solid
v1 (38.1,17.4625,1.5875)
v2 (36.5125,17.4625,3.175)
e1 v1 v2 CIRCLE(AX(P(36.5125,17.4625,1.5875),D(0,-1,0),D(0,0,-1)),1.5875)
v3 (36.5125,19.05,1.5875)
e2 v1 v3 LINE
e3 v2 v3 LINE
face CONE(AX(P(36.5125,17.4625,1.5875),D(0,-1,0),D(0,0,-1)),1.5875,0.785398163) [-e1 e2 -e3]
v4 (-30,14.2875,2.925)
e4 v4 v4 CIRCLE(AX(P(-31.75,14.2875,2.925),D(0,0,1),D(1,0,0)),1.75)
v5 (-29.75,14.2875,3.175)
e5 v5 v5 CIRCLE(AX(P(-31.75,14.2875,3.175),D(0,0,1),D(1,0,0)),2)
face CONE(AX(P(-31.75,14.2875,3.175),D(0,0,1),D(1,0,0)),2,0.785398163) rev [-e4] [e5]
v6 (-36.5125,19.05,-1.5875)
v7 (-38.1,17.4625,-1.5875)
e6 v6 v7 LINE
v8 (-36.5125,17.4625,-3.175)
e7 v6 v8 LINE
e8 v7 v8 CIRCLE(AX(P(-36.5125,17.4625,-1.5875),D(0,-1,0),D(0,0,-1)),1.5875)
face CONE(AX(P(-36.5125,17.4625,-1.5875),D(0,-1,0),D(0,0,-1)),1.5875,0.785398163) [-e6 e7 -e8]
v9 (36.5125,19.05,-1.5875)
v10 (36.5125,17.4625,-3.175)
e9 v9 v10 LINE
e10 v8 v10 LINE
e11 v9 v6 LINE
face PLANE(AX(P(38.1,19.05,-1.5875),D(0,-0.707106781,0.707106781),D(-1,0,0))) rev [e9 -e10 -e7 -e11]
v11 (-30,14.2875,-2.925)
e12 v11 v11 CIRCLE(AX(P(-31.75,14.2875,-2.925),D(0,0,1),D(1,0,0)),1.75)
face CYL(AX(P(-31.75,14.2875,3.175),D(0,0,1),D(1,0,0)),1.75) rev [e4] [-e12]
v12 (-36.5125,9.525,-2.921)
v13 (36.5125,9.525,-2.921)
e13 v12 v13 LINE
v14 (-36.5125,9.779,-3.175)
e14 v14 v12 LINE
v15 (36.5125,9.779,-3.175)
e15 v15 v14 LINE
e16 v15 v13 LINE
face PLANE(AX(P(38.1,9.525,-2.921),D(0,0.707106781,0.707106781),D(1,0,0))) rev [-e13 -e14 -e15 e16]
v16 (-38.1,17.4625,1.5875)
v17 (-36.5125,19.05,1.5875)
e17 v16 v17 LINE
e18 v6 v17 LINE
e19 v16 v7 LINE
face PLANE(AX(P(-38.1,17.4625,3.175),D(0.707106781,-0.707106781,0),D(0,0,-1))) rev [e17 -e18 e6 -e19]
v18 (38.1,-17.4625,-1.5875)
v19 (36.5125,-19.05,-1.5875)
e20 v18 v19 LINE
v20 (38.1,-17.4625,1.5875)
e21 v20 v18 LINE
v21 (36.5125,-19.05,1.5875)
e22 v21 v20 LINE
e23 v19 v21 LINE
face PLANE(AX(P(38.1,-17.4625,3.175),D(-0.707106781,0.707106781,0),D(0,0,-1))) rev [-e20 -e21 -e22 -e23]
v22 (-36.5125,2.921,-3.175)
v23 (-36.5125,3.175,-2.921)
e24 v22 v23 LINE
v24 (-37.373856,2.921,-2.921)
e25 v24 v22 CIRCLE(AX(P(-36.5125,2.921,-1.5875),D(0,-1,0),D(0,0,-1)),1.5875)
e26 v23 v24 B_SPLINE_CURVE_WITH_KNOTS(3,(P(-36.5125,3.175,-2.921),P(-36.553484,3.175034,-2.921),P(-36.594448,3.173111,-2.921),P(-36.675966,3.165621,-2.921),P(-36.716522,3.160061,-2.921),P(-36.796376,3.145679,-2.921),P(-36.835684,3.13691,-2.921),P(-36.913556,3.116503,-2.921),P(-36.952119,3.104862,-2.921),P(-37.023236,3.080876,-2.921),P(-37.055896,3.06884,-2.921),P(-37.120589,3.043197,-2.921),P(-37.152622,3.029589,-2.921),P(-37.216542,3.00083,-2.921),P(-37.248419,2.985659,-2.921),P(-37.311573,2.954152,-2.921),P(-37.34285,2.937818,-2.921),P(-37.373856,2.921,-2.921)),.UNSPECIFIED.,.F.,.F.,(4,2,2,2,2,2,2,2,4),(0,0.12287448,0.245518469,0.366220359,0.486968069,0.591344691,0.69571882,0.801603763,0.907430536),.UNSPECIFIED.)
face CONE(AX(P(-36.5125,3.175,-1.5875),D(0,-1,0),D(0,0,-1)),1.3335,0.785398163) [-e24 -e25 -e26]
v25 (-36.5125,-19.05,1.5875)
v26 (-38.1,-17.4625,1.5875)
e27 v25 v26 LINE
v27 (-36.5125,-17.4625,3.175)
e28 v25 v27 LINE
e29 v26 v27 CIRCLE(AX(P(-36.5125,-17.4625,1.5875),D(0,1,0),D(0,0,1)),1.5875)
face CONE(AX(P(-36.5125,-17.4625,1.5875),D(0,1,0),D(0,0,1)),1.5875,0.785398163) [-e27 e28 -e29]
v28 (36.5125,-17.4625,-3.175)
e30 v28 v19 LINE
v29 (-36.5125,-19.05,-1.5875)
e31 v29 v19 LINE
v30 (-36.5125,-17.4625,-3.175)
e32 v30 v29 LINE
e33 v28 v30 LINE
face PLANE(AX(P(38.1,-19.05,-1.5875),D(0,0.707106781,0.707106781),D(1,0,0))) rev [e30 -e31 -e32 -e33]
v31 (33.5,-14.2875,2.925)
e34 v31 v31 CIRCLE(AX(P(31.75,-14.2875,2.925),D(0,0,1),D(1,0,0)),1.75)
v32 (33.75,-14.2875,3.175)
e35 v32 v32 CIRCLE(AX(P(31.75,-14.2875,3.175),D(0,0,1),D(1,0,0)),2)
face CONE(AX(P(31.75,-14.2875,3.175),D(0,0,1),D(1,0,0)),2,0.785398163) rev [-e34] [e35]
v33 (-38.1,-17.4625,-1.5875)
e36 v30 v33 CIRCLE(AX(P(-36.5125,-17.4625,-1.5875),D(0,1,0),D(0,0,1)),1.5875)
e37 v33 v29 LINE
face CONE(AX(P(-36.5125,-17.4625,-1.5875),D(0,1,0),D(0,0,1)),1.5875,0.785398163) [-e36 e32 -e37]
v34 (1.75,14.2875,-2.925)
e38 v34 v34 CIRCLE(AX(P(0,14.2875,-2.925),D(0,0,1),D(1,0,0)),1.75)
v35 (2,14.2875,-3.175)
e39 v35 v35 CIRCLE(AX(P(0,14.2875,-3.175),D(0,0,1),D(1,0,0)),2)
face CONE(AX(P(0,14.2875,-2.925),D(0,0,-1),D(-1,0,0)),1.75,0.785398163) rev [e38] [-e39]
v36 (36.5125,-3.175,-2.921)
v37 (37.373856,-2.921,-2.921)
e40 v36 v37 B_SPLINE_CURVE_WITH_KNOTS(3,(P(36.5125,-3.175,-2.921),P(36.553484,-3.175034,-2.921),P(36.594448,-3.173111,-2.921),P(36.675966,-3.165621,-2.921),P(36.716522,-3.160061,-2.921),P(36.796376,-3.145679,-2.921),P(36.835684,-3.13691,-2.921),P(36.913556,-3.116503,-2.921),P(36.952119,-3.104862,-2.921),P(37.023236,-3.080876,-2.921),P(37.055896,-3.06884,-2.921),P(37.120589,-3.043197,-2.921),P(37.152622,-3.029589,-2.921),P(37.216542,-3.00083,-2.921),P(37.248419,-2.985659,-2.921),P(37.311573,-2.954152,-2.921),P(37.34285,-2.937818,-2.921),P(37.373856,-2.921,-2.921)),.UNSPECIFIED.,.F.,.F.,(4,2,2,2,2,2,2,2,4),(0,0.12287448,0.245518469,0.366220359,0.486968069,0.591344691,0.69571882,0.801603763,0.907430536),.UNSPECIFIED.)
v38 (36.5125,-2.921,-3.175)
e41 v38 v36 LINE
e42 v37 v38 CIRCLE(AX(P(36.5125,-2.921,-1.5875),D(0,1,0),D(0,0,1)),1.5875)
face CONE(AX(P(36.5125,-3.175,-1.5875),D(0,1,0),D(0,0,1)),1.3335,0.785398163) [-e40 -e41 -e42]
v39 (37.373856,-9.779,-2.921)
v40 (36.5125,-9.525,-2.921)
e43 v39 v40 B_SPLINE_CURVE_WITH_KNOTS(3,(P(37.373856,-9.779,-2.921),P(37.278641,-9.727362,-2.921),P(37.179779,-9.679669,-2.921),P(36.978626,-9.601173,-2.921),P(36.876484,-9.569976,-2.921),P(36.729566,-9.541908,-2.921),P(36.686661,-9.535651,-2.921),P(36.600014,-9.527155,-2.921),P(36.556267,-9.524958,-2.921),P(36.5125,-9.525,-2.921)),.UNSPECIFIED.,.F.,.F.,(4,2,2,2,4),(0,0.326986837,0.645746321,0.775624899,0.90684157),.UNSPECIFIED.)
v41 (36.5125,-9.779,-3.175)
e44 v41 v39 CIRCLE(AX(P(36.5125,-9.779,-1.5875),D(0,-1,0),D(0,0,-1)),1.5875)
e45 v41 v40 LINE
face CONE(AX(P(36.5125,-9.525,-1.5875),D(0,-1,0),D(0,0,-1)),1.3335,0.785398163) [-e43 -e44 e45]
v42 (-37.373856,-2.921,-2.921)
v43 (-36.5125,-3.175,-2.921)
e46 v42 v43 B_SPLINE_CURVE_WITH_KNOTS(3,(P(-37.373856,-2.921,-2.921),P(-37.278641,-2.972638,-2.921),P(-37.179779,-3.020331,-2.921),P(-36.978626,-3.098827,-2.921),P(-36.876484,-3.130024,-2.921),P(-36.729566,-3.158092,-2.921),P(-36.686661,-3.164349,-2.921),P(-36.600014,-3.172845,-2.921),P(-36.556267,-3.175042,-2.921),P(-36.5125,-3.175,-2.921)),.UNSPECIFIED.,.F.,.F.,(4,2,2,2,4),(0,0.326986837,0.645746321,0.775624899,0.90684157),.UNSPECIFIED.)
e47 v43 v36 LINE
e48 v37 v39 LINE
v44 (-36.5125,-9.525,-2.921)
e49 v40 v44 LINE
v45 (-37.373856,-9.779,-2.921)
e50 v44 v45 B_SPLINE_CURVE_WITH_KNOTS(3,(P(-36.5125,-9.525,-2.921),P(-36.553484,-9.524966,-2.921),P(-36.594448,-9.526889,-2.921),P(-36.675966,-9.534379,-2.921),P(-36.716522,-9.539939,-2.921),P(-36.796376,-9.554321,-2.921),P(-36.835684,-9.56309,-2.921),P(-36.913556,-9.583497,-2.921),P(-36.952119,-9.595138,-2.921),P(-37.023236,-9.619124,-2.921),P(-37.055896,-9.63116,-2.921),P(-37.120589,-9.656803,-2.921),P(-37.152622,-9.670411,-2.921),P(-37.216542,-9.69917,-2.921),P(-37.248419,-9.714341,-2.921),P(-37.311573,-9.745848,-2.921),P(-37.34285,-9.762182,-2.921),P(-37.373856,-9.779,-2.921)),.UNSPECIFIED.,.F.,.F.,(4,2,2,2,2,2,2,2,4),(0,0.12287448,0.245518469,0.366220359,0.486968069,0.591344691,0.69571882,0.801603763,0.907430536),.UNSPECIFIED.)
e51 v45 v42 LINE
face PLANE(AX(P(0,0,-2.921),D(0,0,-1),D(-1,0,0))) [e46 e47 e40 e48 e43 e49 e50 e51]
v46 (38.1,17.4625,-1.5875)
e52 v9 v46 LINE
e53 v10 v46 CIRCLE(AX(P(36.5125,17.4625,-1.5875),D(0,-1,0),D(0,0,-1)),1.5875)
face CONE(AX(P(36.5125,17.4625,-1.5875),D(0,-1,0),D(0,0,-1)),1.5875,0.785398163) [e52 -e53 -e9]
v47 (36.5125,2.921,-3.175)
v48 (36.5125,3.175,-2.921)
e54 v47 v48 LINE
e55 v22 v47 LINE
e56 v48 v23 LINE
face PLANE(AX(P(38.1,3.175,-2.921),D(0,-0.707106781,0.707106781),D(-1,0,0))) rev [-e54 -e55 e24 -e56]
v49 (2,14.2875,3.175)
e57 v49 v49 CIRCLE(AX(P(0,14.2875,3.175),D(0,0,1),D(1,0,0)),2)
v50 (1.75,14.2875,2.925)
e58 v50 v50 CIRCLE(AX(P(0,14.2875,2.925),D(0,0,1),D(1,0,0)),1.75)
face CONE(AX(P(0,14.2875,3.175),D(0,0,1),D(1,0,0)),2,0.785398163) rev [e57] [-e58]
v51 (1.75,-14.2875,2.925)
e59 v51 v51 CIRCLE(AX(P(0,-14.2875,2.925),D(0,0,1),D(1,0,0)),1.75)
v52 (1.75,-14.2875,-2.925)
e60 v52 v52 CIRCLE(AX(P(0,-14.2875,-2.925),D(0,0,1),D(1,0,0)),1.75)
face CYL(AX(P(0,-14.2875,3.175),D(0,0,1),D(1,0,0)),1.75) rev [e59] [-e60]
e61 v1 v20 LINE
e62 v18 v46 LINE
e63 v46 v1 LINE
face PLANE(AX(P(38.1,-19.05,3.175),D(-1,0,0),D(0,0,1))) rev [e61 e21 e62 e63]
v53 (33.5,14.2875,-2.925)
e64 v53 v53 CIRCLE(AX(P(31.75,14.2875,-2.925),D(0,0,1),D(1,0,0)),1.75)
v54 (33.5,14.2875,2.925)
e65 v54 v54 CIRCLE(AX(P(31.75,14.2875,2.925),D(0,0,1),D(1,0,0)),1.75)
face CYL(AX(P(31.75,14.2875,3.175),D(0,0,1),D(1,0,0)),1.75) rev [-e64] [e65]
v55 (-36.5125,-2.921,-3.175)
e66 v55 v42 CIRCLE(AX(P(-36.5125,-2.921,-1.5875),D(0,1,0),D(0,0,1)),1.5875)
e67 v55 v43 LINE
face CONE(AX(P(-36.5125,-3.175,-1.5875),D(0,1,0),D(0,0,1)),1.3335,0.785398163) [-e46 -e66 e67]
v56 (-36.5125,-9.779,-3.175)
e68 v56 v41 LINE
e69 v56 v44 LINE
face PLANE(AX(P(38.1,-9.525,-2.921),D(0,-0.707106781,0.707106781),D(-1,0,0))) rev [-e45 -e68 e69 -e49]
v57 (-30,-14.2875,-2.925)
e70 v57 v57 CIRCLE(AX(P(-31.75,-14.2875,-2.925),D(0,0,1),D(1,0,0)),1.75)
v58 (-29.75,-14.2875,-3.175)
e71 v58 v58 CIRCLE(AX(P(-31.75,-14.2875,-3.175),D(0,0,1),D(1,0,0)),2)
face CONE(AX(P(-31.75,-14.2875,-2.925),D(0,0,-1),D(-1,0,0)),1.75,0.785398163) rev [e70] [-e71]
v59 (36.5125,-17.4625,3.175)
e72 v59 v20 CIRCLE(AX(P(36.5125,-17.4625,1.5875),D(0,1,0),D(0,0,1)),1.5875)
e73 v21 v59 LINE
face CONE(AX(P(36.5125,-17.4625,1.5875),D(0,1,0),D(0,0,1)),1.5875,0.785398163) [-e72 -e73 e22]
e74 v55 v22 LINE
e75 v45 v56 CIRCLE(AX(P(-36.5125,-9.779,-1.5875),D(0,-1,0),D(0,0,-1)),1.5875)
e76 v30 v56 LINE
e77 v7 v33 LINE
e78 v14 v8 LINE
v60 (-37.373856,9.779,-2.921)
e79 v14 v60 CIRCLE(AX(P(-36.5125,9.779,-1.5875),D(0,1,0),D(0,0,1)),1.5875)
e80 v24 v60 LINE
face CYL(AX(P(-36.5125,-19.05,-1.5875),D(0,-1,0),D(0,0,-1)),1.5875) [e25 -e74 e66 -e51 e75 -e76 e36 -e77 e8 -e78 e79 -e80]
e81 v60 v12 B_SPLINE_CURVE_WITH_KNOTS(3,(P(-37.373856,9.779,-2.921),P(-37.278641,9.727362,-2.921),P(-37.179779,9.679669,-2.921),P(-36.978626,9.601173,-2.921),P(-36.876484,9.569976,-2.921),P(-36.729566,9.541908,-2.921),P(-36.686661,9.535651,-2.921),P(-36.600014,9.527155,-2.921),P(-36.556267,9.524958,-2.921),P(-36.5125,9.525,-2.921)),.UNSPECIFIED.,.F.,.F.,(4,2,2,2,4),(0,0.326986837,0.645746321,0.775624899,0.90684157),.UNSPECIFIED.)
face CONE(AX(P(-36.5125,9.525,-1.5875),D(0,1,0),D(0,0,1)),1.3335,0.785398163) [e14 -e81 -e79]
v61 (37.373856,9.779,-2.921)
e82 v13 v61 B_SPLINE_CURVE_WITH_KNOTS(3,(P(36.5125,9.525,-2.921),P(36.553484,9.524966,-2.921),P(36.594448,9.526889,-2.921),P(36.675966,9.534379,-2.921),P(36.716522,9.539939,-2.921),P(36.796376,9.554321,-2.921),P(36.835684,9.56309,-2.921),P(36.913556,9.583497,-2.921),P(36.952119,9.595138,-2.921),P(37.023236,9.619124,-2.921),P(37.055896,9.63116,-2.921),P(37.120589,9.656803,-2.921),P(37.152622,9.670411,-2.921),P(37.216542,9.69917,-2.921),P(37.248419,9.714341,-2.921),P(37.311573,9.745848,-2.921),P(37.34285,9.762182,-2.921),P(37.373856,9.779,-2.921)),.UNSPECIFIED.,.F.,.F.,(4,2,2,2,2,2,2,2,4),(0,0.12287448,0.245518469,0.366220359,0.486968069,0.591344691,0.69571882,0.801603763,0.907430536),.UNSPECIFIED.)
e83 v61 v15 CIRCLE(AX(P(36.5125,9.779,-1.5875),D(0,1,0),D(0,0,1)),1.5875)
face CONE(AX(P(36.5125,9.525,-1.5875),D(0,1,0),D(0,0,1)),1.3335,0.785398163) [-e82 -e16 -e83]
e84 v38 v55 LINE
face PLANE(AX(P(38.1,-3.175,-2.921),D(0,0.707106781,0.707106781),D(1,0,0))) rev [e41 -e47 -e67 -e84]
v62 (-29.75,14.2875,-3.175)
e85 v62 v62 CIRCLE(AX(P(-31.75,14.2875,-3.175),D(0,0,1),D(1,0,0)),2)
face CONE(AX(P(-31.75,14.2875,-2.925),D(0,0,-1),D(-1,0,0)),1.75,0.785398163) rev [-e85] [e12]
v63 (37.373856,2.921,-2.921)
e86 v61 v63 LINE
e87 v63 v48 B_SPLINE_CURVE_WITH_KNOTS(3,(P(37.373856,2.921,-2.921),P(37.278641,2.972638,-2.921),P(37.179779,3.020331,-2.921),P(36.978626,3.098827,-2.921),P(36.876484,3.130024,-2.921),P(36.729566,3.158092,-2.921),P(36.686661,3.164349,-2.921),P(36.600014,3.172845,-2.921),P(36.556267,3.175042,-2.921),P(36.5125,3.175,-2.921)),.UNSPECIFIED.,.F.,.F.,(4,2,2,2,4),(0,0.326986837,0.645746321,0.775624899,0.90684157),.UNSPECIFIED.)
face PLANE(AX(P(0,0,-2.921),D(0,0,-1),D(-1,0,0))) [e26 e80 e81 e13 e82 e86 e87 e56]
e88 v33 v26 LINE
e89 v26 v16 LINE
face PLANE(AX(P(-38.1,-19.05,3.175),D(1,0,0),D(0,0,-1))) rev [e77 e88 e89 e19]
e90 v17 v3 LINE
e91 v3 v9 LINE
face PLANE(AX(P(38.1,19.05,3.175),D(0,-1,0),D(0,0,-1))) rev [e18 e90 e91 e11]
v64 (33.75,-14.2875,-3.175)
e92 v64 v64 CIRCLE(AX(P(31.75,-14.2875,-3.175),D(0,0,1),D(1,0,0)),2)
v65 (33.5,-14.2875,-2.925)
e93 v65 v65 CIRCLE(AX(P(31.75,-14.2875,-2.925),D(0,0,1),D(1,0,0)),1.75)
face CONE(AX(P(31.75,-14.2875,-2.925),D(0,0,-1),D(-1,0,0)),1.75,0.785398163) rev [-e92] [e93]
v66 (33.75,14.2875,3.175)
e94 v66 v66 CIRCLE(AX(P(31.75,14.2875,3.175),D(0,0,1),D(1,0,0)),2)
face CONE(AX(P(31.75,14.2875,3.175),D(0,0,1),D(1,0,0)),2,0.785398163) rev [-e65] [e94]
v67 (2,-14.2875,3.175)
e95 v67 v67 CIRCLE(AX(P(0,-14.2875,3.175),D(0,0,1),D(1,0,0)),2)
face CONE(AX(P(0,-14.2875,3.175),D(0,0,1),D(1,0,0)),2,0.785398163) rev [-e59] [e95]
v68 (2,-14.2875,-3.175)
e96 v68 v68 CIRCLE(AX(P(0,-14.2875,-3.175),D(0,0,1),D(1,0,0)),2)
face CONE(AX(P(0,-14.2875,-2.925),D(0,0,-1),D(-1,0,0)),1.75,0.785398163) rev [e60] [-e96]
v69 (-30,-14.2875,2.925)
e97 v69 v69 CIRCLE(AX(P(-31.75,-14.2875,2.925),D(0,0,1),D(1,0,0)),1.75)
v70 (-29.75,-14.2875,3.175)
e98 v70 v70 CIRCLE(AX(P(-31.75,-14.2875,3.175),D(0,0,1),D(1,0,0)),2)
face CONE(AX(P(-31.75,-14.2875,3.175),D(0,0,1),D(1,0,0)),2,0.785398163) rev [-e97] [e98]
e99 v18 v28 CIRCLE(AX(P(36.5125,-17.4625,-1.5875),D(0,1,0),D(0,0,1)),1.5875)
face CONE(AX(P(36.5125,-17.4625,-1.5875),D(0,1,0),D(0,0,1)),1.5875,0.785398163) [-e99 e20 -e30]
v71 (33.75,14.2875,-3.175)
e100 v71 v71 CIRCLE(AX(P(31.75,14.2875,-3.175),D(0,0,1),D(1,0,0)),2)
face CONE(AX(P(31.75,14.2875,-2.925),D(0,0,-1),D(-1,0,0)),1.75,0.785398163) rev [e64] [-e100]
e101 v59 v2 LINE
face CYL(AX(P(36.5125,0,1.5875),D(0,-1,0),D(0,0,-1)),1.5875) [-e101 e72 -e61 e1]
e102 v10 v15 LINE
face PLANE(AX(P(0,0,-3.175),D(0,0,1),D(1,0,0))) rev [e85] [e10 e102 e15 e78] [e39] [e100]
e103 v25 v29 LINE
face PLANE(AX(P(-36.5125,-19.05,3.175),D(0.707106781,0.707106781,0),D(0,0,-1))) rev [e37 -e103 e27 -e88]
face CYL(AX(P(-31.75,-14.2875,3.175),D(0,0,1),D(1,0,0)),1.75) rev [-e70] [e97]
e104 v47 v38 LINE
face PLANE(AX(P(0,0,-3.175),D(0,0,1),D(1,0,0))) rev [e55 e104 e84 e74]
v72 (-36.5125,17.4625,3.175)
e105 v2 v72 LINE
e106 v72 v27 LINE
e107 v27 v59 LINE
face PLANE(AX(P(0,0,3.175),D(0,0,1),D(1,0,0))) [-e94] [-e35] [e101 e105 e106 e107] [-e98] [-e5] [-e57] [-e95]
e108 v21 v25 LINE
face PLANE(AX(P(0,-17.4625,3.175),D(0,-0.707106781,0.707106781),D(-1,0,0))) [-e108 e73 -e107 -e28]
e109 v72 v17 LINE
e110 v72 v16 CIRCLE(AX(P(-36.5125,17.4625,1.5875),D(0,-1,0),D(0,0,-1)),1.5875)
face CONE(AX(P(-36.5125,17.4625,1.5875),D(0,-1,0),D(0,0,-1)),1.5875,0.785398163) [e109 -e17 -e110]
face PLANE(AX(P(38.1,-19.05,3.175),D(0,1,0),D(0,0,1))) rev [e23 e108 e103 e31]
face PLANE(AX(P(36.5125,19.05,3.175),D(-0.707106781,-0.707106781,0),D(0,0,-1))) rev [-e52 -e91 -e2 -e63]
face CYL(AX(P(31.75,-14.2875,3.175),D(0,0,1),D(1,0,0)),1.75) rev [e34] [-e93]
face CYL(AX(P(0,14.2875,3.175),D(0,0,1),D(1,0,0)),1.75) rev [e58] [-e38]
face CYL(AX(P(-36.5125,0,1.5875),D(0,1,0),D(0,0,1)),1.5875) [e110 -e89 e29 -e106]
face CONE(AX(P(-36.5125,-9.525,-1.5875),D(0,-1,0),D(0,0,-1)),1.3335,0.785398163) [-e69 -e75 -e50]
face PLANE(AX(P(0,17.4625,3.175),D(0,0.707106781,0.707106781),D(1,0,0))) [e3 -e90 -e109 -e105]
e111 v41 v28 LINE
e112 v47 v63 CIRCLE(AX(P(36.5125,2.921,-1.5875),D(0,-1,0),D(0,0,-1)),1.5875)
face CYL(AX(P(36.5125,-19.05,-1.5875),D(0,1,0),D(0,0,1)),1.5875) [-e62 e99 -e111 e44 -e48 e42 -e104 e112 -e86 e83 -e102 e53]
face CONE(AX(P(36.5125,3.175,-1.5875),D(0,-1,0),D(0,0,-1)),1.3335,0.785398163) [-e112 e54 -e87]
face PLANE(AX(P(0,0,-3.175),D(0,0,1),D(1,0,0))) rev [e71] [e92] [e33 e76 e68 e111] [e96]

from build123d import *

# Parameters (mm, degrees)
SKETCH1_W                     = 76.2
SKETCH1_H                     = 38.1
BOSS_EXTRUDE1_DEPTH           = 3.175
SKETCH1_2_W                   = 76.2
SKETCH1_2_H                   = 38.1
BOSS_EXTRUDE2_DEPTH           = 3.175
SKETCH10_W                    = 76.2
SKETCH10_H                    = 6.35
CUT_EXTRUDE2_DEPTH            = 0.254
M3_CLEARANCE_HOLE1_AT_2_COUNT = 2
M3_CLEARANCE_HOLE1_AT_2_PITCH = 28.575
M3_CLEARANCE_HOLE1_AT_3_COUNT = 2
M3_CLEARANCE_HOLE1_AT_3_PITCH = 31.75
M3_CLEARANCE_HOLE1_AT_4_COUNT = 2
M3_CLEARANCE_HOLE1_AT_4_PITCH = 42.715256349
M3_CLEARANCE_HOLE1_AT_5_COUNT = 2
M3_CLEARANCE_HOLE1_AT_5_PITCH = 63.5
M3_CLEARANCE_HOLE1_AT_6_COUNT = 2
M3_CLEARANCE_HOLE1_AT_6_PITCH = 69.633186233
FILLET1_R                     = 1.5875
CHAMFER1_SIZE                 = 1.5875
CHAMFER3_SIZE                 = 0.254


with BuildPart() as part:
    # Sketch1 → Boss-Extrude1 (new, symmetric)
    with BuildSketch(Plane.XY):
        Rectangle(SKETCH1_W, SKETCH1_H)
    extrude(amount=BOSS_EXTRUDE1_DEPTH, both=True)

    # Sketch1<2> → Boss-Extrude2 (add, symmetric)
    with BuildSketch(Plane.XY):
        Rectangle(SKETCH1_2_W, SKETCH1_2_H)
    extrude(amount=BOSS_EXTRUDE2_DEPTH, both=True)

    # Sketch10 → Cut-Extrude2 (cut)
    with BuildSketch(Plane(origin=(0, 0, -3.175), x_dir=(-1, 0, 0), z_dir=(0, 0, -1))):
        with Locations((0, 6.35)):
            Rectangle(SKETCH10_W, SKETCH10_H)
        with Locations((0, -6.35)):
            Rectangle(SKETCH10_W, SKETCH10_H)
    extrude(amount=-CUT_EXTRUDE2_DEPTH, mode=Mode.SUBTRACT)

    # Sketch4 → M3 Clearance Hole1 (revolve, cut)
    with BuildSketch(Plane(origin=(-31.75, 14.2875, 3.175), x_dir=(0, -1, 0), z_dir=(1, 0, 0))):
        Polygon((0, 0), (0, 6.35), (2, 6.35), (1.75, 6.1), (1.75, 0.25), (2, 0), align=None)
    m3_clearance_hole1 = revolve(axis=Axis((-31.75, 14.2875, 9.525), (0, 0, -1)), mode=Mode.SUBTRACT)

    # M3 Clearance Hole1 at 2: M3 Clearance Hole1 ×2
    with Locations(*[(0, -i * M3_CLEARANCE_HOLE1_AT_2_PITCH, 0) for i in range(1, M3_CLEARANCE_HOLE1_AT_2_COUNT)]):
        add(m3_clearance_hole1, mode=Mode.SUBTRACT)

    # M3 Clearance Hole1 at 3: M3 Clearance Hole1 ×2
    with Locations(*[(i * M3_CLEARANCE_HOLE1_AT_3_PITCH, 0, 0) for i in range(1, M3_CLEARANCE_HOLE1_AT_3_COUNT)]):
        add(m3_clearance_hole1, mode=Mode.SUBTRACT)

    # M3 Clearance Hole1 at 4: M3 Clearance Hole1 ×2
    with Locations(*[Vector(0.7432941462471665, -0.6689647316224495, 0) * (i * M3_CLEARANCE_HOLE1_AT_4_PITCH) for i in range(1, M3_CLEARANCE_HOLE1_AT_4_COUNT)]):
        add(m3_clearance_hole1, mode=Mode.SUBTRACT)

    # M3 Clearance Hole1 at 5: M3 Clearance Hole1 ×2
    with Locations(*[(i * M3_CLEARANCE_HOLE1_AT_5_PITCH, 0, 0) for i in range(1, M3_CLEARANCE_HOLE1_AT_5_COUNT)]):
        add(m3_clearance_hole1, mode=Mode.SUBTRACT)

    # M3 Clearance Hole1 at 6: M3 Clearance Hole1 ×2
    with Locations(*[Vector(0.9119215051751064, -0.4103646773287979, 0) * (i * M3_CLEARANCE_HOLE1_AT_6_PITCH) for i in range(1, M3_CLEARANCE_HOLE1_AT_6_COUNT)]):
        add(m3_clearance_hole1, mode=Mode.SUBTRACT)

    # Fillet1
    fillet1_edges = [part.edges().sort_by_distance(p)[0] for p in [
        (-38.1, -14.2875, -3.175),
        (-38.1, 0, 3.175),
        (38.1, 0, 3.175),
        (38.1, -14.2875, -3.175),
    ]]
    fillet(fillet1_edges, radius=FILLET1_R)

    # Chamfer1
    chamfer1_edges = [part.edges().sort_by_distance(p)[0] for p in [
        (-38.1, -19.05, 0),
        (-38.1, 19.05, 0),
        (0, -19.05, -3.175),
        (38.1, -19.05, 0),
        (0, -19.05, 3.175),
        (37.635032015, -19.05, -2.710032015),
        (37.635032015, -19.05, 2.710032015),
        (-37.635032015, -19.05, 2.710032015),
        (-37.635032015, -19.05, -2.710032015),
        (-2.84e-07, 19.05, -3.175),
        (0, 19.05, 3.175),
        (38.1, 19.05, 0),
        (37.635032015, 19.05, -2.710032015),
        (37.635032015, 19.05, 2.710032015),
        (-37.635032015, 19.05, 2.710032015),
        (-37.635032216, 19.05, -2.710031814),
    ]]
    chamfer(chamfer1_edges, length=CHAMFER1_SIZE)

    # Chamfer3
    chamfer3_edges = [part.edges().sort_by_distance(p)[0] for p in [
        (0, -9.525, -3.175),
        (36.961512806, -9.525, -3.110176509),
        (-36.961512806, -9.525, -3.110176509),
        (2.84e-07, -3.175, -3.175),
        (36.961513079, -3.175, -3.110176428),
        (-36.961512806, -3.175, -3.110176509),
        (-2.84e-07, 3.175, -3.175),
        (36.961512806, 3.175, -3.110176509),
        (-36.961513079, 3.175, -3.110176428),
        (2.84e-07, 9.525, -3.175),
        (36.961513079, 9.525, -3.110176428),
        (-36.961512806, 9.525, -3.110176509),
    ]]
    chamfer(chamfer3_edges, length=CHAMFER3_SIZE - 0.0001)  # a hair under: the kernel refuses the full size


solid = part.part
